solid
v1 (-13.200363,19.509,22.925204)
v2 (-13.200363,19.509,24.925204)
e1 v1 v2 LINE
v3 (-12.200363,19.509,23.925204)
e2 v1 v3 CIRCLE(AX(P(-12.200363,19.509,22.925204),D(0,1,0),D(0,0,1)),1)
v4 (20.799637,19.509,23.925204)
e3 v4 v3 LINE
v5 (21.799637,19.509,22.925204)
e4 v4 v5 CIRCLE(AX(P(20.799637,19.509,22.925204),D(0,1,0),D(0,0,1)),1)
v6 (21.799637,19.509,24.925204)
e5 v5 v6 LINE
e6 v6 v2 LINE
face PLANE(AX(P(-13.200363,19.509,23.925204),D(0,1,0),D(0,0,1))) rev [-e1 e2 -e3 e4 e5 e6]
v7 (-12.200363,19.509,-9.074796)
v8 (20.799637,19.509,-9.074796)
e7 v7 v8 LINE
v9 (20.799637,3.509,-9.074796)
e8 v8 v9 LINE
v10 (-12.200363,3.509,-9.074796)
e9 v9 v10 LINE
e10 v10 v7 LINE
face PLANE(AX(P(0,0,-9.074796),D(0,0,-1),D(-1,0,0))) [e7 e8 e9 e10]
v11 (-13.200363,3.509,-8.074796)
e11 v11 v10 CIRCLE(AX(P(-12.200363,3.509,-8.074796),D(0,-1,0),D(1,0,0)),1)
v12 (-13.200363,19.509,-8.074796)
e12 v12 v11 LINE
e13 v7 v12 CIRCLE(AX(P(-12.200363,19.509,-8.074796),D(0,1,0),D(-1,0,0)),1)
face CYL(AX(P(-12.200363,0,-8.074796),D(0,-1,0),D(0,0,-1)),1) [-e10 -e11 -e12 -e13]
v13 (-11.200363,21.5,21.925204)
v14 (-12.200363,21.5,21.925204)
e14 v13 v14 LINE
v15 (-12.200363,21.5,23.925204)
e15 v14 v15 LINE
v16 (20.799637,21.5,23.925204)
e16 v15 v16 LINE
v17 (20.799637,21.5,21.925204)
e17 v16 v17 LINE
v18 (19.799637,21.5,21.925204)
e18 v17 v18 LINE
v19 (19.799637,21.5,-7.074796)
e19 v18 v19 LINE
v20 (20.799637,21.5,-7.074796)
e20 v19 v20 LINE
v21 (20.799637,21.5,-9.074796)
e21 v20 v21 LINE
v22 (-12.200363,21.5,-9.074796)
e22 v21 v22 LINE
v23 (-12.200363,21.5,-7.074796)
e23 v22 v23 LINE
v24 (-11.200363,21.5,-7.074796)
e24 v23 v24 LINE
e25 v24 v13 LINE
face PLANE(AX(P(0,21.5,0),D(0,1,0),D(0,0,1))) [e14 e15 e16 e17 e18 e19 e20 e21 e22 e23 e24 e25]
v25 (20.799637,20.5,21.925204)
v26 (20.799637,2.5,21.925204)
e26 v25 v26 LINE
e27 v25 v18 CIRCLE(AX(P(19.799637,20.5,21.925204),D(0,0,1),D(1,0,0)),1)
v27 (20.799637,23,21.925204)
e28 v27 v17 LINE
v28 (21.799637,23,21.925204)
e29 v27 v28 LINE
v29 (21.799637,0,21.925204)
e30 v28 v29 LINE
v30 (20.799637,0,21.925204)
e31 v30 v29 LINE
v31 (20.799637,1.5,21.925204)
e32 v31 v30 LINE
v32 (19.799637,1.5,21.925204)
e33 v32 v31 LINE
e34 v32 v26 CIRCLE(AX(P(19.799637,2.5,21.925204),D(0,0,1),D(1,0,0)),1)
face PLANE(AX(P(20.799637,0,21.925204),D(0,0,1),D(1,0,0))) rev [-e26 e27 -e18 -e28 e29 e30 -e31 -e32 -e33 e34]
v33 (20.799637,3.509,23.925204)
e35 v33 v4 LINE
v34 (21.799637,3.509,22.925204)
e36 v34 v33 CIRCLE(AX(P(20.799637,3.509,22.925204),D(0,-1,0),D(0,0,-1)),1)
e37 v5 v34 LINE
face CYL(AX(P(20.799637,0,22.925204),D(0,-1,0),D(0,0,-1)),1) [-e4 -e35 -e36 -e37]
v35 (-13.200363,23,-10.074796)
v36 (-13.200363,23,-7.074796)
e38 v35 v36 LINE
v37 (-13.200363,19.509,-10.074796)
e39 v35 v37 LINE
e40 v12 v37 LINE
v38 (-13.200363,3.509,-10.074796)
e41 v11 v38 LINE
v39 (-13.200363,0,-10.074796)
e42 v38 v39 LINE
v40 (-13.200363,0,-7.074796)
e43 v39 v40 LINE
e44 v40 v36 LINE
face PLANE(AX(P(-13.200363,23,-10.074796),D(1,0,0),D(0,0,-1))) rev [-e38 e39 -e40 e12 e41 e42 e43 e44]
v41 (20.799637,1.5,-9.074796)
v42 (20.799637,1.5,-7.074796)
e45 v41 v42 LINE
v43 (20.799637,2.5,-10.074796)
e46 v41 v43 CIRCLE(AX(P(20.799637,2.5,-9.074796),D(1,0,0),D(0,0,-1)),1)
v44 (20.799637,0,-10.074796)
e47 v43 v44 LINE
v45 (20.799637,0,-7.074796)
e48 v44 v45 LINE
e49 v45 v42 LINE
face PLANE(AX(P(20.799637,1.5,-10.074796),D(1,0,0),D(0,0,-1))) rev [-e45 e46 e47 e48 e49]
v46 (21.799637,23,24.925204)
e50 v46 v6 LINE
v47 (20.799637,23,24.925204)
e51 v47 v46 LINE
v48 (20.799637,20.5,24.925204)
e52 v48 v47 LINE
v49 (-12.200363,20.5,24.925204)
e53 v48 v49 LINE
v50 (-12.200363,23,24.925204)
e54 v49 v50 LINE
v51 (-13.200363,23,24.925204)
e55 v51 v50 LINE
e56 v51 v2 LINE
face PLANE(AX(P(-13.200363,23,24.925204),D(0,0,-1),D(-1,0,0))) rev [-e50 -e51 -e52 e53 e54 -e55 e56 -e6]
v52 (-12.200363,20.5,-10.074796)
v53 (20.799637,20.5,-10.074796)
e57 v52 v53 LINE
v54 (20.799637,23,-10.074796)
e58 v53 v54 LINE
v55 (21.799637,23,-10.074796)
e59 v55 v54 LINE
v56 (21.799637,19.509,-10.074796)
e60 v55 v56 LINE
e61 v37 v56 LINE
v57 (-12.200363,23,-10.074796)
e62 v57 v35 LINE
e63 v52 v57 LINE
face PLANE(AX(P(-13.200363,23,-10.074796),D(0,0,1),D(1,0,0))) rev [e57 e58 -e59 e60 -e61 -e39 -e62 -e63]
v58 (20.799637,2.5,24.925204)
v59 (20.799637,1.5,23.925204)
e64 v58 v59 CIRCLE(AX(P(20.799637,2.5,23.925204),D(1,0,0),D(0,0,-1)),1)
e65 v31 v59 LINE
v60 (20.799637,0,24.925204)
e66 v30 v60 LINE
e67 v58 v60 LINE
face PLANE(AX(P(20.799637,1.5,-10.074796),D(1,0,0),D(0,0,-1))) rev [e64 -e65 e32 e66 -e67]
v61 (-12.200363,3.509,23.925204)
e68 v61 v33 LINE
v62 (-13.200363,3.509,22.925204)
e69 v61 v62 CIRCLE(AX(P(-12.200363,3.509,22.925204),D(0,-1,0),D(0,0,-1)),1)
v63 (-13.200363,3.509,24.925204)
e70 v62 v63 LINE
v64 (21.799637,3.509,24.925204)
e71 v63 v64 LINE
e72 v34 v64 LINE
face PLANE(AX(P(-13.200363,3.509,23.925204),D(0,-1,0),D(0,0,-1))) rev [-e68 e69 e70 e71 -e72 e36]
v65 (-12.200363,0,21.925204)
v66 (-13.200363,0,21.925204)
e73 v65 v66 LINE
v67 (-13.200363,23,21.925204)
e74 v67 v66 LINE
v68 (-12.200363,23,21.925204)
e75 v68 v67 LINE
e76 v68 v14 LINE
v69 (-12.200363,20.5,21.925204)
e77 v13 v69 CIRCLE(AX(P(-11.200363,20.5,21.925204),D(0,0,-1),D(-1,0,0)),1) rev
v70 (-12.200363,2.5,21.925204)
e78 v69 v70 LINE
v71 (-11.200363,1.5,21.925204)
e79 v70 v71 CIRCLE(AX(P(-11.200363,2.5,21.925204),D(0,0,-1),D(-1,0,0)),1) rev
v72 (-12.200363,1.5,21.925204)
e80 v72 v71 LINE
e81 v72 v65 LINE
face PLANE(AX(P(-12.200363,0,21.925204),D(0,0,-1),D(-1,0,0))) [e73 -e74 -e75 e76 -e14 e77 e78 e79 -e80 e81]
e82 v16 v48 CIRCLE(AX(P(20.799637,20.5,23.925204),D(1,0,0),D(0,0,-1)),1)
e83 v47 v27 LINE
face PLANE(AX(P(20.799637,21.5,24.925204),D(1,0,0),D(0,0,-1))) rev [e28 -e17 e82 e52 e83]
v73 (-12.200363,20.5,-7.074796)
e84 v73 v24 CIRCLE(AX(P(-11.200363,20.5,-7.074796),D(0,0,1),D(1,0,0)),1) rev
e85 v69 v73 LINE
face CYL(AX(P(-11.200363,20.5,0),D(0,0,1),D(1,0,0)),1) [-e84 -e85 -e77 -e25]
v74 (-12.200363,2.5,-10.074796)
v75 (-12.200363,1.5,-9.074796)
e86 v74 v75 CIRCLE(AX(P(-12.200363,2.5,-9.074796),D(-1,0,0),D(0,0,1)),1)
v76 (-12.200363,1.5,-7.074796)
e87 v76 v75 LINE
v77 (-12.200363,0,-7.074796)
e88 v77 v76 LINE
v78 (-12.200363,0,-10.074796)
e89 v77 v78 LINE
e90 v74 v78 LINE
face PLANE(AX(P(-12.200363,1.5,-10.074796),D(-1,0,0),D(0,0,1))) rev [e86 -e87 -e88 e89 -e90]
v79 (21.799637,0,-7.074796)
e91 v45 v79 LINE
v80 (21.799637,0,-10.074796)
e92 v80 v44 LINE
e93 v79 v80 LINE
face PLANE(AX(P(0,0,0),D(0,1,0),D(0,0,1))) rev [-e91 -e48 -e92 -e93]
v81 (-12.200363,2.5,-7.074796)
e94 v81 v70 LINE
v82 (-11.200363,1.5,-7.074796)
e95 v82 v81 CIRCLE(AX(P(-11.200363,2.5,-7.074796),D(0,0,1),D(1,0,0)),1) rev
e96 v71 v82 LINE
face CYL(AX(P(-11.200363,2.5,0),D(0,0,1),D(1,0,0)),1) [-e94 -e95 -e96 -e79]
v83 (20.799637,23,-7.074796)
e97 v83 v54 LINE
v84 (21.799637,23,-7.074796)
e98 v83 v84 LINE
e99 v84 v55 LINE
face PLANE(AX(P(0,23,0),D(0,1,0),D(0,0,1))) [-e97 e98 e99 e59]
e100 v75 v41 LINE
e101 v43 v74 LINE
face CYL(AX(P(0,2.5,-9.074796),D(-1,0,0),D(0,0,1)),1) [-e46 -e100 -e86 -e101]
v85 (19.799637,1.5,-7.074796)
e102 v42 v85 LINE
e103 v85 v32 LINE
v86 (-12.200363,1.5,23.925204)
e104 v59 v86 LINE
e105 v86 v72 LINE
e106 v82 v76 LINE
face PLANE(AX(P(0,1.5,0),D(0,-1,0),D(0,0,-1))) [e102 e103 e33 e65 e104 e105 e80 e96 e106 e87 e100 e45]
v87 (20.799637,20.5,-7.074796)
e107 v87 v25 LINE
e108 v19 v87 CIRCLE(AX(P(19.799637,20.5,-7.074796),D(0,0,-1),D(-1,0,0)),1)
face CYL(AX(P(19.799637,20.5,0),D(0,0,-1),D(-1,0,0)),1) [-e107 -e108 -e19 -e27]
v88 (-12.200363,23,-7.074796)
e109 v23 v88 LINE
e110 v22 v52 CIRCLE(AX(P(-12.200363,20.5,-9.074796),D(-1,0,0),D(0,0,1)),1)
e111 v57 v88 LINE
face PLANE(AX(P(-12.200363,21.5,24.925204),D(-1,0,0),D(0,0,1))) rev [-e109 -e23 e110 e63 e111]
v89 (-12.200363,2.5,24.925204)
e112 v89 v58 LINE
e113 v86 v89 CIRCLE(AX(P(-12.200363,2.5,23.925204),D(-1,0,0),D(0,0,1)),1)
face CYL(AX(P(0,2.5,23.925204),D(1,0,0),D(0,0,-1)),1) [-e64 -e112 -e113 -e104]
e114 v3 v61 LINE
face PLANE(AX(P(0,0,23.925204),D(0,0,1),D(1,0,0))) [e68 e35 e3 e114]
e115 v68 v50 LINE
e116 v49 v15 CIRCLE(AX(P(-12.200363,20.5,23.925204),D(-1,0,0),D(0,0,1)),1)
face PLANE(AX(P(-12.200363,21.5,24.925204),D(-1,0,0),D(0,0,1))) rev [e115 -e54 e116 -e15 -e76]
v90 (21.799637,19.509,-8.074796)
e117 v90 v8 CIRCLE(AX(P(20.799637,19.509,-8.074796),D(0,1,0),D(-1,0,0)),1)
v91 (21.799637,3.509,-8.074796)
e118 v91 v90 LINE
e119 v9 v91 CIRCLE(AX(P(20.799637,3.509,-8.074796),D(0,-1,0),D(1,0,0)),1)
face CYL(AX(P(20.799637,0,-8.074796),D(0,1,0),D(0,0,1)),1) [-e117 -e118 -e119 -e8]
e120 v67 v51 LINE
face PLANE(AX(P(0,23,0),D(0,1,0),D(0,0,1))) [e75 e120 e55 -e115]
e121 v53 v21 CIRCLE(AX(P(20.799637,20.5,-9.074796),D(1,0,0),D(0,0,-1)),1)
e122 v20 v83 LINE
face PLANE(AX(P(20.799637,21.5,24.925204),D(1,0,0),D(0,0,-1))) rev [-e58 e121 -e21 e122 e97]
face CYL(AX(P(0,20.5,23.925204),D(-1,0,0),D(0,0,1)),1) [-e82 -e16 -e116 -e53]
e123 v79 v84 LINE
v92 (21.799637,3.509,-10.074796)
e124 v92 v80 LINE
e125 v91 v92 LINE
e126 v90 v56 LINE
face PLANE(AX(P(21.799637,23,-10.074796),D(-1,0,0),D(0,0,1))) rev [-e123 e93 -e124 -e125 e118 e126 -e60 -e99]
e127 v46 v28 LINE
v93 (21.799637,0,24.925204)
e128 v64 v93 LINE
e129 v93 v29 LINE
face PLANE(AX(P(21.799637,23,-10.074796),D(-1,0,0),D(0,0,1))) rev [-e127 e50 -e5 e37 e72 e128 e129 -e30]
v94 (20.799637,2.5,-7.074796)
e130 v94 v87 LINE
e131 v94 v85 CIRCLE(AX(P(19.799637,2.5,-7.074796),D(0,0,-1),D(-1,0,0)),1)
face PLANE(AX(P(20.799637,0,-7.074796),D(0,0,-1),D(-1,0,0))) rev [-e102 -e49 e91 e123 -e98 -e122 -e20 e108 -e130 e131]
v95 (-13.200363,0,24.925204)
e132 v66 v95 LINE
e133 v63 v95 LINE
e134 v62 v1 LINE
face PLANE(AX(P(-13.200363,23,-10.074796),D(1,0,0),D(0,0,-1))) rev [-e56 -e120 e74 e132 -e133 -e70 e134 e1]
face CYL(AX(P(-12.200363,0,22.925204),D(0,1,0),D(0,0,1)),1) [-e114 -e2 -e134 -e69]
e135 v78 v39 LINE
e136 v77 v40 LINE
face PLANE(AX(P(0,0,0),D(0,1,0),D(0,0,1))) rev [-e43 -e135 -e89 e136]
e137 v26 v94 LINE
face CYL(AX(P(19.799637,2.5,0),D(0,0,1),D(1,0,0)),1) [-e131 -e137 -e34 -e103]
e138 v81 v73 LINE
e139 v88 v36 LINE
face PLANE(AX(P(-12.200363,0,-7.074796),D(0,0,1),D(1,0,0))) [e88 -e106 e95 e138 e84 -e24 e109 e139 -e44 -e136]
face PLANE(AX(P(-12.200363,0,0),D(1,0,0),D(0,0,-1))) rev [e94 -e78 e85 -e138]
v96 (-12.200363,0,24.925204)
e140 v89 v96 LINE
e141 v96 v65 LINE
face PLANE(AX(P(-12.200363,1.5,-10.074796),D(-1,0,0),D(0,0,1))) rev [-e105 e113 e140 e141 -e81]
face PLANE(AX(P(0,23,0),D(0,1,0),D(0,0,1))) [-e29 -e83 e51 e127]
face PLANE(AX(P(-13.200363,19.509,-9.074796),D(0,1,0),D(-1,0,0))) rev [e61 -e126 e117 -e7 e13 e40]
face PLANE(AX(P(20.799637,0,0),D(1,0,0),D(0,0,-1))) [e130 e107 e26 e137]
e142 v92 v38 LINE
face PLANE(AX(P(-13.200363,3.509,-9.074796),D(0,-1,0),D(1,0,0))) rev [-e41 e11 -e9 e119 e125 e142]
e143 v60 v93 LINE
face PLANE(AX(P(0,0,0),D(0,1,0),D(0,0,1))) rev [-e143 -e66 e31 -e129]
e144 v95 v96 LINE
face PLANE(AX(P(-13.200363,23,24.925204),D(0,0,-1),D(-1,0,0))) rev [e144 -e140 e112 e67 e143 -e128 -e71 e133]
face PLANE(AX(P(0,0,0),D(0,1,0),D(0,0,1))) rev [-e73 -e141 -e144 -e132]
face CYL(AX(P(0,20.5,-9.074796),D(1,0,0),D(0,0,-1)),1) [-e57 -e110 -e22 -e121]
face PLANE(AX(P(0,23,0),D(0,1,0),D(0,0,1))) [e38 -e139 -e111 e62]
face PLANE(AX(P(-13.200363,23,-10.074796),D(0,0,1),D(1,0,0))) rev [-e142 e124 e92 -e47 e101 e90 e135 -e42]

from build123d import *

# Parameters (mm, degrees)
BOSS_EXTRUDE1_DEPTH = 23
CUT_EXTRUDE1_DEPTH  = 1.5
CUT_EXTRUDE2_DEPTH  = 1.5
FILLET2_R           = 1
FILLET3_R           = 1
FILLET4_R           = 1
FILLET5_R           = 1
CUT_EXTRUDE3_DEPTH  = 1
FILLET6_R           = 1
FILLET7_R           = 1
SKETCH6_W           = 35
SKETCH6_H           = 16.000000000000004
CUT_EXTRUDE4_DEPTH  = 1
FILLET8_R           = 1
FILLET9_R           = 1
CUT_EXTRUDE5_DEPTH  = 1
CUT_EXTRUDE6_DEPTH  = 1
FILLET10_R          = 1
FILLET11_R          = 1
FILLET12_R          = 1
FILLET13_R          = 1


with BuildPart() as part:
    # Sketch1 → Boss-Extrude1 (new body)
    with BuildSketch(Plane(origin=(0, 0, 0), x_dir=(1, 0, 0), z_dir=(0, 1, 0))):
        Polygon((-13.200362647325472, 10.07479601087942), (21.799637352674534, 10.07479601087942), (21.799637352674537, -24.925203989120583), (-13.200362647325466, -24.925203989120583), align=None)
    extrude(amount=BOSS_EXTRUDE1_DEPTH)

    # Sketch2 → Cut-Extrude1 (cut)
    with BuildSketch(Plane(origin=(0, 23, 0), x_dir=(1, 0, 0), z_dir=(0, 1, 0))):
        Polygon((20.79963735267453, -24.925203989120583), (-12.200362647325468, -24.925203989120586), (-12.20036264732547, 10.074796010879416), (20.79963735267453, 10.07479601087942), align=None)
    extrude(amount=-CUT_EXTRUDE1_DEPTH, mode=Mode.SUBTRACT)

    # Sketch3 → Cut-Extrude2 (cut)
    with BuildSketch(Plane.XZ):
        Polygon((20.799637352674537, -10.07479601087942), (-12.200362647325464, -10.074796010879423), (-12.200362647325463, 24.92520398912058), (20.799637352674537, 24.925203989120583), align=None)
    extrude(amount=-CUT_EXTRUDE2_DEPTH, mode=Mode.SUBTRACT)

    # Fillet2
    fillet2_edges = [part.edges().sort_by_distance(p)[0] for p in [
        (4.29963735267453, 21.5, -10.074796010879417),
    ]]
    fillet(fillet2_edges, radius=FILLET2_R)

    # Fillet3
    fillet3_edges = [part.edges().sort_by_distance(p)[0] for p in [
        (4.29963735267453, 21.5, 24.925203989120583),
    ]]
    fillet(fillet3_edges, radius=FILLET3_R)

    # Fillet4
    fillet4_edges = [part.edges().sort_by_distance(p)[0] for p in [
        (4.299637352674537, 1.5, 24.925203989120583),
    ]]
    fillet(fillet4_edges, radius=FILLET4_R)

    # Fillet5
    fillet5_edges = [part.edges().sort_by_distance(p)[0] for p in [
        (4.299637352674537, 1.5, -10.074796010879421),
    ]]
    fillet(fillet5_edges, radius=FILLET5_R)

    # Sketch5 → Cut-Extrude3 (cut)
    with BuildSketch(Plane(origin=(0, 0, -10.07479601087942), x_dir=(-1, 0, 0), z_dir=(0, 0, -1))):
        Polygon((13.200362647325472, 3.5089999999999977), (-21.799637352674534, 3.5089999999999937), (-21.799637352674534, 19.508999999999997), (13.200362647325472, 19.509), align=None)
    extrude(amount=-CUT_EXTRUDE3_DEPTH, mode=Mode.SUBTRACT)

    # Fillet6
    fillet6_edges = [part.edges().sort_by_distance(p)[0] for p in [
        (-13.200362647325472, 11.508999999999999, -9.07479601087942),
    ]]
    fillet(fillet6_edges, radius=FILLET6_R)

    # Fillet7
    fillet7_edges = [part.edges().sort_by_distance(p)[0] for p in [
        (21.799637352674534, 11.508999999999995, -9.07479601087942),
    ]]
    fillet(fillet7_edges, radius=FILLET7_R)

    # Sketch6 → Cut-Extrude4 (cut)
    with BuildSketch(Plane.XY.offset(24.925203989120583)):
        with Locations((4.299637352674536, 11.508999999999999)):
            Rectangle(SKETCH6_W, SKETCH6_H)
    extrude(amount=-CUT_EXTRUDE4_DEPTH, mode=Mode.SUBTRACT)

    # Fillet8
    fillet8_edges = [part.edges().sort_by_distance(p)[0] for p in [
        (-13.200362647325463, 11.509, 23.925203989120583),
    ]]
    fillet(fillet8_edges, radius=FILLET8_R)

    # Fillet9
    fillet9_edges = [part.edges().sort_by_distance(p)[0] for p in [
        (21.799637352674537, 11.508999999999999, 23.925203989120583),
    ]]
    fillet(fillet9_edges, radius=FILLET9_R)

    # Sketch7 → Cut-Extrude5 (cut)
    with BuildSketch(Plane(origin=(21.799637352674537, 0, -4.32e-15), x_dir=(-2e-16, 0, -1), z_dir=(1, 0, -2e-16))):
        Polygon((7.074796010879417, -1.2e-16), (-21.925203989120586, -3.95e-15), (-21.925203989120586, 22.999999999999996), (7.074796010879417, 22.999999999999996), align=None)
    extrude(amount=-CUT_EXTRUDE5_DEPTH, mode=Mode.SUBTRACT)

    # Sketch8 → Cut-Extrude6 (cut)
    with BuildSketch(Plane(origin=(-13.200362647325473, 0, -13.200362647325468), x_dir=(-1.5e-16, 0, -1), z_dir=(1, 0, -1.5e-16))):
        Polygon((-6.125566636446044, 8e-17), (-35.125566636446045, -3.47e-15), (-35.125566636446045, 22.999999999999996), (-6.1255666364460435, 23), align=None)
    extrude(amount=CUT_EXTRUDE6_DEPTH, mode=Mode.SUBTRACT)

    # Fillet10
    fillet10_edges = [part.edges().sort_by_distance(p)[0] for p in [
        (-12.20036264732547, 21.5, 7.425203989120572),
    ]]
    fillet(fillet10_edges, radius=FILLET10_R)

    # Fillet11
    fillet11_edges = [part.edges().sort_by_distance(p)[0] for p in [
        (-12.200362647325463, 1.5, 7.425203989120577),
    ]]
    fillet(fillet11_edges, radius=FILLET11_R)

    # Fillet12
    # the kernel refuses this fillet: 1 mm, written as the material it takes off along each edge
    with BuildSketch(Plane(origin=(20.79963735267453, 21.5, -7.074796010879421), x_dir=(-1, 0, 0), z_dir=(0, 0, 1))) as fillet12_piece_1:
        with BuildLine():
            CenterArc((FILLET12_R, FILLET12_R), FILLET12_R, 180, 90)
            Line((0, FILLET12_R), (0, 0))
            Line((0, 0), (FILLET12_R, 0))
        make_face()
    extrude(amount=29.000000000000004, mode=Mode.SUBTRACT)

    # Fillet13
    # the kernel refuses this fillet: 1 mm, written as the material it takes off along each edge
    with BuildSketch(Plane(origin=(20.799637352674537, 1.5, 21.925203989120583), x_dir=(-1, 0, 0), z_dir=(0, 0, -1))) as fillet13_piece_1:
        with BuildLine():
            CenterArc((FILLET13_R, FILLET13_R), FILLET13_R, 180, 90)
            Line((0, FILLET13_R), (0, 0))
            Line((0, 0), (FILLET13_R, 0))
        make_face()
    extrude(amount=29, mode=Mode.SUBTRACT)


solid = part.part
